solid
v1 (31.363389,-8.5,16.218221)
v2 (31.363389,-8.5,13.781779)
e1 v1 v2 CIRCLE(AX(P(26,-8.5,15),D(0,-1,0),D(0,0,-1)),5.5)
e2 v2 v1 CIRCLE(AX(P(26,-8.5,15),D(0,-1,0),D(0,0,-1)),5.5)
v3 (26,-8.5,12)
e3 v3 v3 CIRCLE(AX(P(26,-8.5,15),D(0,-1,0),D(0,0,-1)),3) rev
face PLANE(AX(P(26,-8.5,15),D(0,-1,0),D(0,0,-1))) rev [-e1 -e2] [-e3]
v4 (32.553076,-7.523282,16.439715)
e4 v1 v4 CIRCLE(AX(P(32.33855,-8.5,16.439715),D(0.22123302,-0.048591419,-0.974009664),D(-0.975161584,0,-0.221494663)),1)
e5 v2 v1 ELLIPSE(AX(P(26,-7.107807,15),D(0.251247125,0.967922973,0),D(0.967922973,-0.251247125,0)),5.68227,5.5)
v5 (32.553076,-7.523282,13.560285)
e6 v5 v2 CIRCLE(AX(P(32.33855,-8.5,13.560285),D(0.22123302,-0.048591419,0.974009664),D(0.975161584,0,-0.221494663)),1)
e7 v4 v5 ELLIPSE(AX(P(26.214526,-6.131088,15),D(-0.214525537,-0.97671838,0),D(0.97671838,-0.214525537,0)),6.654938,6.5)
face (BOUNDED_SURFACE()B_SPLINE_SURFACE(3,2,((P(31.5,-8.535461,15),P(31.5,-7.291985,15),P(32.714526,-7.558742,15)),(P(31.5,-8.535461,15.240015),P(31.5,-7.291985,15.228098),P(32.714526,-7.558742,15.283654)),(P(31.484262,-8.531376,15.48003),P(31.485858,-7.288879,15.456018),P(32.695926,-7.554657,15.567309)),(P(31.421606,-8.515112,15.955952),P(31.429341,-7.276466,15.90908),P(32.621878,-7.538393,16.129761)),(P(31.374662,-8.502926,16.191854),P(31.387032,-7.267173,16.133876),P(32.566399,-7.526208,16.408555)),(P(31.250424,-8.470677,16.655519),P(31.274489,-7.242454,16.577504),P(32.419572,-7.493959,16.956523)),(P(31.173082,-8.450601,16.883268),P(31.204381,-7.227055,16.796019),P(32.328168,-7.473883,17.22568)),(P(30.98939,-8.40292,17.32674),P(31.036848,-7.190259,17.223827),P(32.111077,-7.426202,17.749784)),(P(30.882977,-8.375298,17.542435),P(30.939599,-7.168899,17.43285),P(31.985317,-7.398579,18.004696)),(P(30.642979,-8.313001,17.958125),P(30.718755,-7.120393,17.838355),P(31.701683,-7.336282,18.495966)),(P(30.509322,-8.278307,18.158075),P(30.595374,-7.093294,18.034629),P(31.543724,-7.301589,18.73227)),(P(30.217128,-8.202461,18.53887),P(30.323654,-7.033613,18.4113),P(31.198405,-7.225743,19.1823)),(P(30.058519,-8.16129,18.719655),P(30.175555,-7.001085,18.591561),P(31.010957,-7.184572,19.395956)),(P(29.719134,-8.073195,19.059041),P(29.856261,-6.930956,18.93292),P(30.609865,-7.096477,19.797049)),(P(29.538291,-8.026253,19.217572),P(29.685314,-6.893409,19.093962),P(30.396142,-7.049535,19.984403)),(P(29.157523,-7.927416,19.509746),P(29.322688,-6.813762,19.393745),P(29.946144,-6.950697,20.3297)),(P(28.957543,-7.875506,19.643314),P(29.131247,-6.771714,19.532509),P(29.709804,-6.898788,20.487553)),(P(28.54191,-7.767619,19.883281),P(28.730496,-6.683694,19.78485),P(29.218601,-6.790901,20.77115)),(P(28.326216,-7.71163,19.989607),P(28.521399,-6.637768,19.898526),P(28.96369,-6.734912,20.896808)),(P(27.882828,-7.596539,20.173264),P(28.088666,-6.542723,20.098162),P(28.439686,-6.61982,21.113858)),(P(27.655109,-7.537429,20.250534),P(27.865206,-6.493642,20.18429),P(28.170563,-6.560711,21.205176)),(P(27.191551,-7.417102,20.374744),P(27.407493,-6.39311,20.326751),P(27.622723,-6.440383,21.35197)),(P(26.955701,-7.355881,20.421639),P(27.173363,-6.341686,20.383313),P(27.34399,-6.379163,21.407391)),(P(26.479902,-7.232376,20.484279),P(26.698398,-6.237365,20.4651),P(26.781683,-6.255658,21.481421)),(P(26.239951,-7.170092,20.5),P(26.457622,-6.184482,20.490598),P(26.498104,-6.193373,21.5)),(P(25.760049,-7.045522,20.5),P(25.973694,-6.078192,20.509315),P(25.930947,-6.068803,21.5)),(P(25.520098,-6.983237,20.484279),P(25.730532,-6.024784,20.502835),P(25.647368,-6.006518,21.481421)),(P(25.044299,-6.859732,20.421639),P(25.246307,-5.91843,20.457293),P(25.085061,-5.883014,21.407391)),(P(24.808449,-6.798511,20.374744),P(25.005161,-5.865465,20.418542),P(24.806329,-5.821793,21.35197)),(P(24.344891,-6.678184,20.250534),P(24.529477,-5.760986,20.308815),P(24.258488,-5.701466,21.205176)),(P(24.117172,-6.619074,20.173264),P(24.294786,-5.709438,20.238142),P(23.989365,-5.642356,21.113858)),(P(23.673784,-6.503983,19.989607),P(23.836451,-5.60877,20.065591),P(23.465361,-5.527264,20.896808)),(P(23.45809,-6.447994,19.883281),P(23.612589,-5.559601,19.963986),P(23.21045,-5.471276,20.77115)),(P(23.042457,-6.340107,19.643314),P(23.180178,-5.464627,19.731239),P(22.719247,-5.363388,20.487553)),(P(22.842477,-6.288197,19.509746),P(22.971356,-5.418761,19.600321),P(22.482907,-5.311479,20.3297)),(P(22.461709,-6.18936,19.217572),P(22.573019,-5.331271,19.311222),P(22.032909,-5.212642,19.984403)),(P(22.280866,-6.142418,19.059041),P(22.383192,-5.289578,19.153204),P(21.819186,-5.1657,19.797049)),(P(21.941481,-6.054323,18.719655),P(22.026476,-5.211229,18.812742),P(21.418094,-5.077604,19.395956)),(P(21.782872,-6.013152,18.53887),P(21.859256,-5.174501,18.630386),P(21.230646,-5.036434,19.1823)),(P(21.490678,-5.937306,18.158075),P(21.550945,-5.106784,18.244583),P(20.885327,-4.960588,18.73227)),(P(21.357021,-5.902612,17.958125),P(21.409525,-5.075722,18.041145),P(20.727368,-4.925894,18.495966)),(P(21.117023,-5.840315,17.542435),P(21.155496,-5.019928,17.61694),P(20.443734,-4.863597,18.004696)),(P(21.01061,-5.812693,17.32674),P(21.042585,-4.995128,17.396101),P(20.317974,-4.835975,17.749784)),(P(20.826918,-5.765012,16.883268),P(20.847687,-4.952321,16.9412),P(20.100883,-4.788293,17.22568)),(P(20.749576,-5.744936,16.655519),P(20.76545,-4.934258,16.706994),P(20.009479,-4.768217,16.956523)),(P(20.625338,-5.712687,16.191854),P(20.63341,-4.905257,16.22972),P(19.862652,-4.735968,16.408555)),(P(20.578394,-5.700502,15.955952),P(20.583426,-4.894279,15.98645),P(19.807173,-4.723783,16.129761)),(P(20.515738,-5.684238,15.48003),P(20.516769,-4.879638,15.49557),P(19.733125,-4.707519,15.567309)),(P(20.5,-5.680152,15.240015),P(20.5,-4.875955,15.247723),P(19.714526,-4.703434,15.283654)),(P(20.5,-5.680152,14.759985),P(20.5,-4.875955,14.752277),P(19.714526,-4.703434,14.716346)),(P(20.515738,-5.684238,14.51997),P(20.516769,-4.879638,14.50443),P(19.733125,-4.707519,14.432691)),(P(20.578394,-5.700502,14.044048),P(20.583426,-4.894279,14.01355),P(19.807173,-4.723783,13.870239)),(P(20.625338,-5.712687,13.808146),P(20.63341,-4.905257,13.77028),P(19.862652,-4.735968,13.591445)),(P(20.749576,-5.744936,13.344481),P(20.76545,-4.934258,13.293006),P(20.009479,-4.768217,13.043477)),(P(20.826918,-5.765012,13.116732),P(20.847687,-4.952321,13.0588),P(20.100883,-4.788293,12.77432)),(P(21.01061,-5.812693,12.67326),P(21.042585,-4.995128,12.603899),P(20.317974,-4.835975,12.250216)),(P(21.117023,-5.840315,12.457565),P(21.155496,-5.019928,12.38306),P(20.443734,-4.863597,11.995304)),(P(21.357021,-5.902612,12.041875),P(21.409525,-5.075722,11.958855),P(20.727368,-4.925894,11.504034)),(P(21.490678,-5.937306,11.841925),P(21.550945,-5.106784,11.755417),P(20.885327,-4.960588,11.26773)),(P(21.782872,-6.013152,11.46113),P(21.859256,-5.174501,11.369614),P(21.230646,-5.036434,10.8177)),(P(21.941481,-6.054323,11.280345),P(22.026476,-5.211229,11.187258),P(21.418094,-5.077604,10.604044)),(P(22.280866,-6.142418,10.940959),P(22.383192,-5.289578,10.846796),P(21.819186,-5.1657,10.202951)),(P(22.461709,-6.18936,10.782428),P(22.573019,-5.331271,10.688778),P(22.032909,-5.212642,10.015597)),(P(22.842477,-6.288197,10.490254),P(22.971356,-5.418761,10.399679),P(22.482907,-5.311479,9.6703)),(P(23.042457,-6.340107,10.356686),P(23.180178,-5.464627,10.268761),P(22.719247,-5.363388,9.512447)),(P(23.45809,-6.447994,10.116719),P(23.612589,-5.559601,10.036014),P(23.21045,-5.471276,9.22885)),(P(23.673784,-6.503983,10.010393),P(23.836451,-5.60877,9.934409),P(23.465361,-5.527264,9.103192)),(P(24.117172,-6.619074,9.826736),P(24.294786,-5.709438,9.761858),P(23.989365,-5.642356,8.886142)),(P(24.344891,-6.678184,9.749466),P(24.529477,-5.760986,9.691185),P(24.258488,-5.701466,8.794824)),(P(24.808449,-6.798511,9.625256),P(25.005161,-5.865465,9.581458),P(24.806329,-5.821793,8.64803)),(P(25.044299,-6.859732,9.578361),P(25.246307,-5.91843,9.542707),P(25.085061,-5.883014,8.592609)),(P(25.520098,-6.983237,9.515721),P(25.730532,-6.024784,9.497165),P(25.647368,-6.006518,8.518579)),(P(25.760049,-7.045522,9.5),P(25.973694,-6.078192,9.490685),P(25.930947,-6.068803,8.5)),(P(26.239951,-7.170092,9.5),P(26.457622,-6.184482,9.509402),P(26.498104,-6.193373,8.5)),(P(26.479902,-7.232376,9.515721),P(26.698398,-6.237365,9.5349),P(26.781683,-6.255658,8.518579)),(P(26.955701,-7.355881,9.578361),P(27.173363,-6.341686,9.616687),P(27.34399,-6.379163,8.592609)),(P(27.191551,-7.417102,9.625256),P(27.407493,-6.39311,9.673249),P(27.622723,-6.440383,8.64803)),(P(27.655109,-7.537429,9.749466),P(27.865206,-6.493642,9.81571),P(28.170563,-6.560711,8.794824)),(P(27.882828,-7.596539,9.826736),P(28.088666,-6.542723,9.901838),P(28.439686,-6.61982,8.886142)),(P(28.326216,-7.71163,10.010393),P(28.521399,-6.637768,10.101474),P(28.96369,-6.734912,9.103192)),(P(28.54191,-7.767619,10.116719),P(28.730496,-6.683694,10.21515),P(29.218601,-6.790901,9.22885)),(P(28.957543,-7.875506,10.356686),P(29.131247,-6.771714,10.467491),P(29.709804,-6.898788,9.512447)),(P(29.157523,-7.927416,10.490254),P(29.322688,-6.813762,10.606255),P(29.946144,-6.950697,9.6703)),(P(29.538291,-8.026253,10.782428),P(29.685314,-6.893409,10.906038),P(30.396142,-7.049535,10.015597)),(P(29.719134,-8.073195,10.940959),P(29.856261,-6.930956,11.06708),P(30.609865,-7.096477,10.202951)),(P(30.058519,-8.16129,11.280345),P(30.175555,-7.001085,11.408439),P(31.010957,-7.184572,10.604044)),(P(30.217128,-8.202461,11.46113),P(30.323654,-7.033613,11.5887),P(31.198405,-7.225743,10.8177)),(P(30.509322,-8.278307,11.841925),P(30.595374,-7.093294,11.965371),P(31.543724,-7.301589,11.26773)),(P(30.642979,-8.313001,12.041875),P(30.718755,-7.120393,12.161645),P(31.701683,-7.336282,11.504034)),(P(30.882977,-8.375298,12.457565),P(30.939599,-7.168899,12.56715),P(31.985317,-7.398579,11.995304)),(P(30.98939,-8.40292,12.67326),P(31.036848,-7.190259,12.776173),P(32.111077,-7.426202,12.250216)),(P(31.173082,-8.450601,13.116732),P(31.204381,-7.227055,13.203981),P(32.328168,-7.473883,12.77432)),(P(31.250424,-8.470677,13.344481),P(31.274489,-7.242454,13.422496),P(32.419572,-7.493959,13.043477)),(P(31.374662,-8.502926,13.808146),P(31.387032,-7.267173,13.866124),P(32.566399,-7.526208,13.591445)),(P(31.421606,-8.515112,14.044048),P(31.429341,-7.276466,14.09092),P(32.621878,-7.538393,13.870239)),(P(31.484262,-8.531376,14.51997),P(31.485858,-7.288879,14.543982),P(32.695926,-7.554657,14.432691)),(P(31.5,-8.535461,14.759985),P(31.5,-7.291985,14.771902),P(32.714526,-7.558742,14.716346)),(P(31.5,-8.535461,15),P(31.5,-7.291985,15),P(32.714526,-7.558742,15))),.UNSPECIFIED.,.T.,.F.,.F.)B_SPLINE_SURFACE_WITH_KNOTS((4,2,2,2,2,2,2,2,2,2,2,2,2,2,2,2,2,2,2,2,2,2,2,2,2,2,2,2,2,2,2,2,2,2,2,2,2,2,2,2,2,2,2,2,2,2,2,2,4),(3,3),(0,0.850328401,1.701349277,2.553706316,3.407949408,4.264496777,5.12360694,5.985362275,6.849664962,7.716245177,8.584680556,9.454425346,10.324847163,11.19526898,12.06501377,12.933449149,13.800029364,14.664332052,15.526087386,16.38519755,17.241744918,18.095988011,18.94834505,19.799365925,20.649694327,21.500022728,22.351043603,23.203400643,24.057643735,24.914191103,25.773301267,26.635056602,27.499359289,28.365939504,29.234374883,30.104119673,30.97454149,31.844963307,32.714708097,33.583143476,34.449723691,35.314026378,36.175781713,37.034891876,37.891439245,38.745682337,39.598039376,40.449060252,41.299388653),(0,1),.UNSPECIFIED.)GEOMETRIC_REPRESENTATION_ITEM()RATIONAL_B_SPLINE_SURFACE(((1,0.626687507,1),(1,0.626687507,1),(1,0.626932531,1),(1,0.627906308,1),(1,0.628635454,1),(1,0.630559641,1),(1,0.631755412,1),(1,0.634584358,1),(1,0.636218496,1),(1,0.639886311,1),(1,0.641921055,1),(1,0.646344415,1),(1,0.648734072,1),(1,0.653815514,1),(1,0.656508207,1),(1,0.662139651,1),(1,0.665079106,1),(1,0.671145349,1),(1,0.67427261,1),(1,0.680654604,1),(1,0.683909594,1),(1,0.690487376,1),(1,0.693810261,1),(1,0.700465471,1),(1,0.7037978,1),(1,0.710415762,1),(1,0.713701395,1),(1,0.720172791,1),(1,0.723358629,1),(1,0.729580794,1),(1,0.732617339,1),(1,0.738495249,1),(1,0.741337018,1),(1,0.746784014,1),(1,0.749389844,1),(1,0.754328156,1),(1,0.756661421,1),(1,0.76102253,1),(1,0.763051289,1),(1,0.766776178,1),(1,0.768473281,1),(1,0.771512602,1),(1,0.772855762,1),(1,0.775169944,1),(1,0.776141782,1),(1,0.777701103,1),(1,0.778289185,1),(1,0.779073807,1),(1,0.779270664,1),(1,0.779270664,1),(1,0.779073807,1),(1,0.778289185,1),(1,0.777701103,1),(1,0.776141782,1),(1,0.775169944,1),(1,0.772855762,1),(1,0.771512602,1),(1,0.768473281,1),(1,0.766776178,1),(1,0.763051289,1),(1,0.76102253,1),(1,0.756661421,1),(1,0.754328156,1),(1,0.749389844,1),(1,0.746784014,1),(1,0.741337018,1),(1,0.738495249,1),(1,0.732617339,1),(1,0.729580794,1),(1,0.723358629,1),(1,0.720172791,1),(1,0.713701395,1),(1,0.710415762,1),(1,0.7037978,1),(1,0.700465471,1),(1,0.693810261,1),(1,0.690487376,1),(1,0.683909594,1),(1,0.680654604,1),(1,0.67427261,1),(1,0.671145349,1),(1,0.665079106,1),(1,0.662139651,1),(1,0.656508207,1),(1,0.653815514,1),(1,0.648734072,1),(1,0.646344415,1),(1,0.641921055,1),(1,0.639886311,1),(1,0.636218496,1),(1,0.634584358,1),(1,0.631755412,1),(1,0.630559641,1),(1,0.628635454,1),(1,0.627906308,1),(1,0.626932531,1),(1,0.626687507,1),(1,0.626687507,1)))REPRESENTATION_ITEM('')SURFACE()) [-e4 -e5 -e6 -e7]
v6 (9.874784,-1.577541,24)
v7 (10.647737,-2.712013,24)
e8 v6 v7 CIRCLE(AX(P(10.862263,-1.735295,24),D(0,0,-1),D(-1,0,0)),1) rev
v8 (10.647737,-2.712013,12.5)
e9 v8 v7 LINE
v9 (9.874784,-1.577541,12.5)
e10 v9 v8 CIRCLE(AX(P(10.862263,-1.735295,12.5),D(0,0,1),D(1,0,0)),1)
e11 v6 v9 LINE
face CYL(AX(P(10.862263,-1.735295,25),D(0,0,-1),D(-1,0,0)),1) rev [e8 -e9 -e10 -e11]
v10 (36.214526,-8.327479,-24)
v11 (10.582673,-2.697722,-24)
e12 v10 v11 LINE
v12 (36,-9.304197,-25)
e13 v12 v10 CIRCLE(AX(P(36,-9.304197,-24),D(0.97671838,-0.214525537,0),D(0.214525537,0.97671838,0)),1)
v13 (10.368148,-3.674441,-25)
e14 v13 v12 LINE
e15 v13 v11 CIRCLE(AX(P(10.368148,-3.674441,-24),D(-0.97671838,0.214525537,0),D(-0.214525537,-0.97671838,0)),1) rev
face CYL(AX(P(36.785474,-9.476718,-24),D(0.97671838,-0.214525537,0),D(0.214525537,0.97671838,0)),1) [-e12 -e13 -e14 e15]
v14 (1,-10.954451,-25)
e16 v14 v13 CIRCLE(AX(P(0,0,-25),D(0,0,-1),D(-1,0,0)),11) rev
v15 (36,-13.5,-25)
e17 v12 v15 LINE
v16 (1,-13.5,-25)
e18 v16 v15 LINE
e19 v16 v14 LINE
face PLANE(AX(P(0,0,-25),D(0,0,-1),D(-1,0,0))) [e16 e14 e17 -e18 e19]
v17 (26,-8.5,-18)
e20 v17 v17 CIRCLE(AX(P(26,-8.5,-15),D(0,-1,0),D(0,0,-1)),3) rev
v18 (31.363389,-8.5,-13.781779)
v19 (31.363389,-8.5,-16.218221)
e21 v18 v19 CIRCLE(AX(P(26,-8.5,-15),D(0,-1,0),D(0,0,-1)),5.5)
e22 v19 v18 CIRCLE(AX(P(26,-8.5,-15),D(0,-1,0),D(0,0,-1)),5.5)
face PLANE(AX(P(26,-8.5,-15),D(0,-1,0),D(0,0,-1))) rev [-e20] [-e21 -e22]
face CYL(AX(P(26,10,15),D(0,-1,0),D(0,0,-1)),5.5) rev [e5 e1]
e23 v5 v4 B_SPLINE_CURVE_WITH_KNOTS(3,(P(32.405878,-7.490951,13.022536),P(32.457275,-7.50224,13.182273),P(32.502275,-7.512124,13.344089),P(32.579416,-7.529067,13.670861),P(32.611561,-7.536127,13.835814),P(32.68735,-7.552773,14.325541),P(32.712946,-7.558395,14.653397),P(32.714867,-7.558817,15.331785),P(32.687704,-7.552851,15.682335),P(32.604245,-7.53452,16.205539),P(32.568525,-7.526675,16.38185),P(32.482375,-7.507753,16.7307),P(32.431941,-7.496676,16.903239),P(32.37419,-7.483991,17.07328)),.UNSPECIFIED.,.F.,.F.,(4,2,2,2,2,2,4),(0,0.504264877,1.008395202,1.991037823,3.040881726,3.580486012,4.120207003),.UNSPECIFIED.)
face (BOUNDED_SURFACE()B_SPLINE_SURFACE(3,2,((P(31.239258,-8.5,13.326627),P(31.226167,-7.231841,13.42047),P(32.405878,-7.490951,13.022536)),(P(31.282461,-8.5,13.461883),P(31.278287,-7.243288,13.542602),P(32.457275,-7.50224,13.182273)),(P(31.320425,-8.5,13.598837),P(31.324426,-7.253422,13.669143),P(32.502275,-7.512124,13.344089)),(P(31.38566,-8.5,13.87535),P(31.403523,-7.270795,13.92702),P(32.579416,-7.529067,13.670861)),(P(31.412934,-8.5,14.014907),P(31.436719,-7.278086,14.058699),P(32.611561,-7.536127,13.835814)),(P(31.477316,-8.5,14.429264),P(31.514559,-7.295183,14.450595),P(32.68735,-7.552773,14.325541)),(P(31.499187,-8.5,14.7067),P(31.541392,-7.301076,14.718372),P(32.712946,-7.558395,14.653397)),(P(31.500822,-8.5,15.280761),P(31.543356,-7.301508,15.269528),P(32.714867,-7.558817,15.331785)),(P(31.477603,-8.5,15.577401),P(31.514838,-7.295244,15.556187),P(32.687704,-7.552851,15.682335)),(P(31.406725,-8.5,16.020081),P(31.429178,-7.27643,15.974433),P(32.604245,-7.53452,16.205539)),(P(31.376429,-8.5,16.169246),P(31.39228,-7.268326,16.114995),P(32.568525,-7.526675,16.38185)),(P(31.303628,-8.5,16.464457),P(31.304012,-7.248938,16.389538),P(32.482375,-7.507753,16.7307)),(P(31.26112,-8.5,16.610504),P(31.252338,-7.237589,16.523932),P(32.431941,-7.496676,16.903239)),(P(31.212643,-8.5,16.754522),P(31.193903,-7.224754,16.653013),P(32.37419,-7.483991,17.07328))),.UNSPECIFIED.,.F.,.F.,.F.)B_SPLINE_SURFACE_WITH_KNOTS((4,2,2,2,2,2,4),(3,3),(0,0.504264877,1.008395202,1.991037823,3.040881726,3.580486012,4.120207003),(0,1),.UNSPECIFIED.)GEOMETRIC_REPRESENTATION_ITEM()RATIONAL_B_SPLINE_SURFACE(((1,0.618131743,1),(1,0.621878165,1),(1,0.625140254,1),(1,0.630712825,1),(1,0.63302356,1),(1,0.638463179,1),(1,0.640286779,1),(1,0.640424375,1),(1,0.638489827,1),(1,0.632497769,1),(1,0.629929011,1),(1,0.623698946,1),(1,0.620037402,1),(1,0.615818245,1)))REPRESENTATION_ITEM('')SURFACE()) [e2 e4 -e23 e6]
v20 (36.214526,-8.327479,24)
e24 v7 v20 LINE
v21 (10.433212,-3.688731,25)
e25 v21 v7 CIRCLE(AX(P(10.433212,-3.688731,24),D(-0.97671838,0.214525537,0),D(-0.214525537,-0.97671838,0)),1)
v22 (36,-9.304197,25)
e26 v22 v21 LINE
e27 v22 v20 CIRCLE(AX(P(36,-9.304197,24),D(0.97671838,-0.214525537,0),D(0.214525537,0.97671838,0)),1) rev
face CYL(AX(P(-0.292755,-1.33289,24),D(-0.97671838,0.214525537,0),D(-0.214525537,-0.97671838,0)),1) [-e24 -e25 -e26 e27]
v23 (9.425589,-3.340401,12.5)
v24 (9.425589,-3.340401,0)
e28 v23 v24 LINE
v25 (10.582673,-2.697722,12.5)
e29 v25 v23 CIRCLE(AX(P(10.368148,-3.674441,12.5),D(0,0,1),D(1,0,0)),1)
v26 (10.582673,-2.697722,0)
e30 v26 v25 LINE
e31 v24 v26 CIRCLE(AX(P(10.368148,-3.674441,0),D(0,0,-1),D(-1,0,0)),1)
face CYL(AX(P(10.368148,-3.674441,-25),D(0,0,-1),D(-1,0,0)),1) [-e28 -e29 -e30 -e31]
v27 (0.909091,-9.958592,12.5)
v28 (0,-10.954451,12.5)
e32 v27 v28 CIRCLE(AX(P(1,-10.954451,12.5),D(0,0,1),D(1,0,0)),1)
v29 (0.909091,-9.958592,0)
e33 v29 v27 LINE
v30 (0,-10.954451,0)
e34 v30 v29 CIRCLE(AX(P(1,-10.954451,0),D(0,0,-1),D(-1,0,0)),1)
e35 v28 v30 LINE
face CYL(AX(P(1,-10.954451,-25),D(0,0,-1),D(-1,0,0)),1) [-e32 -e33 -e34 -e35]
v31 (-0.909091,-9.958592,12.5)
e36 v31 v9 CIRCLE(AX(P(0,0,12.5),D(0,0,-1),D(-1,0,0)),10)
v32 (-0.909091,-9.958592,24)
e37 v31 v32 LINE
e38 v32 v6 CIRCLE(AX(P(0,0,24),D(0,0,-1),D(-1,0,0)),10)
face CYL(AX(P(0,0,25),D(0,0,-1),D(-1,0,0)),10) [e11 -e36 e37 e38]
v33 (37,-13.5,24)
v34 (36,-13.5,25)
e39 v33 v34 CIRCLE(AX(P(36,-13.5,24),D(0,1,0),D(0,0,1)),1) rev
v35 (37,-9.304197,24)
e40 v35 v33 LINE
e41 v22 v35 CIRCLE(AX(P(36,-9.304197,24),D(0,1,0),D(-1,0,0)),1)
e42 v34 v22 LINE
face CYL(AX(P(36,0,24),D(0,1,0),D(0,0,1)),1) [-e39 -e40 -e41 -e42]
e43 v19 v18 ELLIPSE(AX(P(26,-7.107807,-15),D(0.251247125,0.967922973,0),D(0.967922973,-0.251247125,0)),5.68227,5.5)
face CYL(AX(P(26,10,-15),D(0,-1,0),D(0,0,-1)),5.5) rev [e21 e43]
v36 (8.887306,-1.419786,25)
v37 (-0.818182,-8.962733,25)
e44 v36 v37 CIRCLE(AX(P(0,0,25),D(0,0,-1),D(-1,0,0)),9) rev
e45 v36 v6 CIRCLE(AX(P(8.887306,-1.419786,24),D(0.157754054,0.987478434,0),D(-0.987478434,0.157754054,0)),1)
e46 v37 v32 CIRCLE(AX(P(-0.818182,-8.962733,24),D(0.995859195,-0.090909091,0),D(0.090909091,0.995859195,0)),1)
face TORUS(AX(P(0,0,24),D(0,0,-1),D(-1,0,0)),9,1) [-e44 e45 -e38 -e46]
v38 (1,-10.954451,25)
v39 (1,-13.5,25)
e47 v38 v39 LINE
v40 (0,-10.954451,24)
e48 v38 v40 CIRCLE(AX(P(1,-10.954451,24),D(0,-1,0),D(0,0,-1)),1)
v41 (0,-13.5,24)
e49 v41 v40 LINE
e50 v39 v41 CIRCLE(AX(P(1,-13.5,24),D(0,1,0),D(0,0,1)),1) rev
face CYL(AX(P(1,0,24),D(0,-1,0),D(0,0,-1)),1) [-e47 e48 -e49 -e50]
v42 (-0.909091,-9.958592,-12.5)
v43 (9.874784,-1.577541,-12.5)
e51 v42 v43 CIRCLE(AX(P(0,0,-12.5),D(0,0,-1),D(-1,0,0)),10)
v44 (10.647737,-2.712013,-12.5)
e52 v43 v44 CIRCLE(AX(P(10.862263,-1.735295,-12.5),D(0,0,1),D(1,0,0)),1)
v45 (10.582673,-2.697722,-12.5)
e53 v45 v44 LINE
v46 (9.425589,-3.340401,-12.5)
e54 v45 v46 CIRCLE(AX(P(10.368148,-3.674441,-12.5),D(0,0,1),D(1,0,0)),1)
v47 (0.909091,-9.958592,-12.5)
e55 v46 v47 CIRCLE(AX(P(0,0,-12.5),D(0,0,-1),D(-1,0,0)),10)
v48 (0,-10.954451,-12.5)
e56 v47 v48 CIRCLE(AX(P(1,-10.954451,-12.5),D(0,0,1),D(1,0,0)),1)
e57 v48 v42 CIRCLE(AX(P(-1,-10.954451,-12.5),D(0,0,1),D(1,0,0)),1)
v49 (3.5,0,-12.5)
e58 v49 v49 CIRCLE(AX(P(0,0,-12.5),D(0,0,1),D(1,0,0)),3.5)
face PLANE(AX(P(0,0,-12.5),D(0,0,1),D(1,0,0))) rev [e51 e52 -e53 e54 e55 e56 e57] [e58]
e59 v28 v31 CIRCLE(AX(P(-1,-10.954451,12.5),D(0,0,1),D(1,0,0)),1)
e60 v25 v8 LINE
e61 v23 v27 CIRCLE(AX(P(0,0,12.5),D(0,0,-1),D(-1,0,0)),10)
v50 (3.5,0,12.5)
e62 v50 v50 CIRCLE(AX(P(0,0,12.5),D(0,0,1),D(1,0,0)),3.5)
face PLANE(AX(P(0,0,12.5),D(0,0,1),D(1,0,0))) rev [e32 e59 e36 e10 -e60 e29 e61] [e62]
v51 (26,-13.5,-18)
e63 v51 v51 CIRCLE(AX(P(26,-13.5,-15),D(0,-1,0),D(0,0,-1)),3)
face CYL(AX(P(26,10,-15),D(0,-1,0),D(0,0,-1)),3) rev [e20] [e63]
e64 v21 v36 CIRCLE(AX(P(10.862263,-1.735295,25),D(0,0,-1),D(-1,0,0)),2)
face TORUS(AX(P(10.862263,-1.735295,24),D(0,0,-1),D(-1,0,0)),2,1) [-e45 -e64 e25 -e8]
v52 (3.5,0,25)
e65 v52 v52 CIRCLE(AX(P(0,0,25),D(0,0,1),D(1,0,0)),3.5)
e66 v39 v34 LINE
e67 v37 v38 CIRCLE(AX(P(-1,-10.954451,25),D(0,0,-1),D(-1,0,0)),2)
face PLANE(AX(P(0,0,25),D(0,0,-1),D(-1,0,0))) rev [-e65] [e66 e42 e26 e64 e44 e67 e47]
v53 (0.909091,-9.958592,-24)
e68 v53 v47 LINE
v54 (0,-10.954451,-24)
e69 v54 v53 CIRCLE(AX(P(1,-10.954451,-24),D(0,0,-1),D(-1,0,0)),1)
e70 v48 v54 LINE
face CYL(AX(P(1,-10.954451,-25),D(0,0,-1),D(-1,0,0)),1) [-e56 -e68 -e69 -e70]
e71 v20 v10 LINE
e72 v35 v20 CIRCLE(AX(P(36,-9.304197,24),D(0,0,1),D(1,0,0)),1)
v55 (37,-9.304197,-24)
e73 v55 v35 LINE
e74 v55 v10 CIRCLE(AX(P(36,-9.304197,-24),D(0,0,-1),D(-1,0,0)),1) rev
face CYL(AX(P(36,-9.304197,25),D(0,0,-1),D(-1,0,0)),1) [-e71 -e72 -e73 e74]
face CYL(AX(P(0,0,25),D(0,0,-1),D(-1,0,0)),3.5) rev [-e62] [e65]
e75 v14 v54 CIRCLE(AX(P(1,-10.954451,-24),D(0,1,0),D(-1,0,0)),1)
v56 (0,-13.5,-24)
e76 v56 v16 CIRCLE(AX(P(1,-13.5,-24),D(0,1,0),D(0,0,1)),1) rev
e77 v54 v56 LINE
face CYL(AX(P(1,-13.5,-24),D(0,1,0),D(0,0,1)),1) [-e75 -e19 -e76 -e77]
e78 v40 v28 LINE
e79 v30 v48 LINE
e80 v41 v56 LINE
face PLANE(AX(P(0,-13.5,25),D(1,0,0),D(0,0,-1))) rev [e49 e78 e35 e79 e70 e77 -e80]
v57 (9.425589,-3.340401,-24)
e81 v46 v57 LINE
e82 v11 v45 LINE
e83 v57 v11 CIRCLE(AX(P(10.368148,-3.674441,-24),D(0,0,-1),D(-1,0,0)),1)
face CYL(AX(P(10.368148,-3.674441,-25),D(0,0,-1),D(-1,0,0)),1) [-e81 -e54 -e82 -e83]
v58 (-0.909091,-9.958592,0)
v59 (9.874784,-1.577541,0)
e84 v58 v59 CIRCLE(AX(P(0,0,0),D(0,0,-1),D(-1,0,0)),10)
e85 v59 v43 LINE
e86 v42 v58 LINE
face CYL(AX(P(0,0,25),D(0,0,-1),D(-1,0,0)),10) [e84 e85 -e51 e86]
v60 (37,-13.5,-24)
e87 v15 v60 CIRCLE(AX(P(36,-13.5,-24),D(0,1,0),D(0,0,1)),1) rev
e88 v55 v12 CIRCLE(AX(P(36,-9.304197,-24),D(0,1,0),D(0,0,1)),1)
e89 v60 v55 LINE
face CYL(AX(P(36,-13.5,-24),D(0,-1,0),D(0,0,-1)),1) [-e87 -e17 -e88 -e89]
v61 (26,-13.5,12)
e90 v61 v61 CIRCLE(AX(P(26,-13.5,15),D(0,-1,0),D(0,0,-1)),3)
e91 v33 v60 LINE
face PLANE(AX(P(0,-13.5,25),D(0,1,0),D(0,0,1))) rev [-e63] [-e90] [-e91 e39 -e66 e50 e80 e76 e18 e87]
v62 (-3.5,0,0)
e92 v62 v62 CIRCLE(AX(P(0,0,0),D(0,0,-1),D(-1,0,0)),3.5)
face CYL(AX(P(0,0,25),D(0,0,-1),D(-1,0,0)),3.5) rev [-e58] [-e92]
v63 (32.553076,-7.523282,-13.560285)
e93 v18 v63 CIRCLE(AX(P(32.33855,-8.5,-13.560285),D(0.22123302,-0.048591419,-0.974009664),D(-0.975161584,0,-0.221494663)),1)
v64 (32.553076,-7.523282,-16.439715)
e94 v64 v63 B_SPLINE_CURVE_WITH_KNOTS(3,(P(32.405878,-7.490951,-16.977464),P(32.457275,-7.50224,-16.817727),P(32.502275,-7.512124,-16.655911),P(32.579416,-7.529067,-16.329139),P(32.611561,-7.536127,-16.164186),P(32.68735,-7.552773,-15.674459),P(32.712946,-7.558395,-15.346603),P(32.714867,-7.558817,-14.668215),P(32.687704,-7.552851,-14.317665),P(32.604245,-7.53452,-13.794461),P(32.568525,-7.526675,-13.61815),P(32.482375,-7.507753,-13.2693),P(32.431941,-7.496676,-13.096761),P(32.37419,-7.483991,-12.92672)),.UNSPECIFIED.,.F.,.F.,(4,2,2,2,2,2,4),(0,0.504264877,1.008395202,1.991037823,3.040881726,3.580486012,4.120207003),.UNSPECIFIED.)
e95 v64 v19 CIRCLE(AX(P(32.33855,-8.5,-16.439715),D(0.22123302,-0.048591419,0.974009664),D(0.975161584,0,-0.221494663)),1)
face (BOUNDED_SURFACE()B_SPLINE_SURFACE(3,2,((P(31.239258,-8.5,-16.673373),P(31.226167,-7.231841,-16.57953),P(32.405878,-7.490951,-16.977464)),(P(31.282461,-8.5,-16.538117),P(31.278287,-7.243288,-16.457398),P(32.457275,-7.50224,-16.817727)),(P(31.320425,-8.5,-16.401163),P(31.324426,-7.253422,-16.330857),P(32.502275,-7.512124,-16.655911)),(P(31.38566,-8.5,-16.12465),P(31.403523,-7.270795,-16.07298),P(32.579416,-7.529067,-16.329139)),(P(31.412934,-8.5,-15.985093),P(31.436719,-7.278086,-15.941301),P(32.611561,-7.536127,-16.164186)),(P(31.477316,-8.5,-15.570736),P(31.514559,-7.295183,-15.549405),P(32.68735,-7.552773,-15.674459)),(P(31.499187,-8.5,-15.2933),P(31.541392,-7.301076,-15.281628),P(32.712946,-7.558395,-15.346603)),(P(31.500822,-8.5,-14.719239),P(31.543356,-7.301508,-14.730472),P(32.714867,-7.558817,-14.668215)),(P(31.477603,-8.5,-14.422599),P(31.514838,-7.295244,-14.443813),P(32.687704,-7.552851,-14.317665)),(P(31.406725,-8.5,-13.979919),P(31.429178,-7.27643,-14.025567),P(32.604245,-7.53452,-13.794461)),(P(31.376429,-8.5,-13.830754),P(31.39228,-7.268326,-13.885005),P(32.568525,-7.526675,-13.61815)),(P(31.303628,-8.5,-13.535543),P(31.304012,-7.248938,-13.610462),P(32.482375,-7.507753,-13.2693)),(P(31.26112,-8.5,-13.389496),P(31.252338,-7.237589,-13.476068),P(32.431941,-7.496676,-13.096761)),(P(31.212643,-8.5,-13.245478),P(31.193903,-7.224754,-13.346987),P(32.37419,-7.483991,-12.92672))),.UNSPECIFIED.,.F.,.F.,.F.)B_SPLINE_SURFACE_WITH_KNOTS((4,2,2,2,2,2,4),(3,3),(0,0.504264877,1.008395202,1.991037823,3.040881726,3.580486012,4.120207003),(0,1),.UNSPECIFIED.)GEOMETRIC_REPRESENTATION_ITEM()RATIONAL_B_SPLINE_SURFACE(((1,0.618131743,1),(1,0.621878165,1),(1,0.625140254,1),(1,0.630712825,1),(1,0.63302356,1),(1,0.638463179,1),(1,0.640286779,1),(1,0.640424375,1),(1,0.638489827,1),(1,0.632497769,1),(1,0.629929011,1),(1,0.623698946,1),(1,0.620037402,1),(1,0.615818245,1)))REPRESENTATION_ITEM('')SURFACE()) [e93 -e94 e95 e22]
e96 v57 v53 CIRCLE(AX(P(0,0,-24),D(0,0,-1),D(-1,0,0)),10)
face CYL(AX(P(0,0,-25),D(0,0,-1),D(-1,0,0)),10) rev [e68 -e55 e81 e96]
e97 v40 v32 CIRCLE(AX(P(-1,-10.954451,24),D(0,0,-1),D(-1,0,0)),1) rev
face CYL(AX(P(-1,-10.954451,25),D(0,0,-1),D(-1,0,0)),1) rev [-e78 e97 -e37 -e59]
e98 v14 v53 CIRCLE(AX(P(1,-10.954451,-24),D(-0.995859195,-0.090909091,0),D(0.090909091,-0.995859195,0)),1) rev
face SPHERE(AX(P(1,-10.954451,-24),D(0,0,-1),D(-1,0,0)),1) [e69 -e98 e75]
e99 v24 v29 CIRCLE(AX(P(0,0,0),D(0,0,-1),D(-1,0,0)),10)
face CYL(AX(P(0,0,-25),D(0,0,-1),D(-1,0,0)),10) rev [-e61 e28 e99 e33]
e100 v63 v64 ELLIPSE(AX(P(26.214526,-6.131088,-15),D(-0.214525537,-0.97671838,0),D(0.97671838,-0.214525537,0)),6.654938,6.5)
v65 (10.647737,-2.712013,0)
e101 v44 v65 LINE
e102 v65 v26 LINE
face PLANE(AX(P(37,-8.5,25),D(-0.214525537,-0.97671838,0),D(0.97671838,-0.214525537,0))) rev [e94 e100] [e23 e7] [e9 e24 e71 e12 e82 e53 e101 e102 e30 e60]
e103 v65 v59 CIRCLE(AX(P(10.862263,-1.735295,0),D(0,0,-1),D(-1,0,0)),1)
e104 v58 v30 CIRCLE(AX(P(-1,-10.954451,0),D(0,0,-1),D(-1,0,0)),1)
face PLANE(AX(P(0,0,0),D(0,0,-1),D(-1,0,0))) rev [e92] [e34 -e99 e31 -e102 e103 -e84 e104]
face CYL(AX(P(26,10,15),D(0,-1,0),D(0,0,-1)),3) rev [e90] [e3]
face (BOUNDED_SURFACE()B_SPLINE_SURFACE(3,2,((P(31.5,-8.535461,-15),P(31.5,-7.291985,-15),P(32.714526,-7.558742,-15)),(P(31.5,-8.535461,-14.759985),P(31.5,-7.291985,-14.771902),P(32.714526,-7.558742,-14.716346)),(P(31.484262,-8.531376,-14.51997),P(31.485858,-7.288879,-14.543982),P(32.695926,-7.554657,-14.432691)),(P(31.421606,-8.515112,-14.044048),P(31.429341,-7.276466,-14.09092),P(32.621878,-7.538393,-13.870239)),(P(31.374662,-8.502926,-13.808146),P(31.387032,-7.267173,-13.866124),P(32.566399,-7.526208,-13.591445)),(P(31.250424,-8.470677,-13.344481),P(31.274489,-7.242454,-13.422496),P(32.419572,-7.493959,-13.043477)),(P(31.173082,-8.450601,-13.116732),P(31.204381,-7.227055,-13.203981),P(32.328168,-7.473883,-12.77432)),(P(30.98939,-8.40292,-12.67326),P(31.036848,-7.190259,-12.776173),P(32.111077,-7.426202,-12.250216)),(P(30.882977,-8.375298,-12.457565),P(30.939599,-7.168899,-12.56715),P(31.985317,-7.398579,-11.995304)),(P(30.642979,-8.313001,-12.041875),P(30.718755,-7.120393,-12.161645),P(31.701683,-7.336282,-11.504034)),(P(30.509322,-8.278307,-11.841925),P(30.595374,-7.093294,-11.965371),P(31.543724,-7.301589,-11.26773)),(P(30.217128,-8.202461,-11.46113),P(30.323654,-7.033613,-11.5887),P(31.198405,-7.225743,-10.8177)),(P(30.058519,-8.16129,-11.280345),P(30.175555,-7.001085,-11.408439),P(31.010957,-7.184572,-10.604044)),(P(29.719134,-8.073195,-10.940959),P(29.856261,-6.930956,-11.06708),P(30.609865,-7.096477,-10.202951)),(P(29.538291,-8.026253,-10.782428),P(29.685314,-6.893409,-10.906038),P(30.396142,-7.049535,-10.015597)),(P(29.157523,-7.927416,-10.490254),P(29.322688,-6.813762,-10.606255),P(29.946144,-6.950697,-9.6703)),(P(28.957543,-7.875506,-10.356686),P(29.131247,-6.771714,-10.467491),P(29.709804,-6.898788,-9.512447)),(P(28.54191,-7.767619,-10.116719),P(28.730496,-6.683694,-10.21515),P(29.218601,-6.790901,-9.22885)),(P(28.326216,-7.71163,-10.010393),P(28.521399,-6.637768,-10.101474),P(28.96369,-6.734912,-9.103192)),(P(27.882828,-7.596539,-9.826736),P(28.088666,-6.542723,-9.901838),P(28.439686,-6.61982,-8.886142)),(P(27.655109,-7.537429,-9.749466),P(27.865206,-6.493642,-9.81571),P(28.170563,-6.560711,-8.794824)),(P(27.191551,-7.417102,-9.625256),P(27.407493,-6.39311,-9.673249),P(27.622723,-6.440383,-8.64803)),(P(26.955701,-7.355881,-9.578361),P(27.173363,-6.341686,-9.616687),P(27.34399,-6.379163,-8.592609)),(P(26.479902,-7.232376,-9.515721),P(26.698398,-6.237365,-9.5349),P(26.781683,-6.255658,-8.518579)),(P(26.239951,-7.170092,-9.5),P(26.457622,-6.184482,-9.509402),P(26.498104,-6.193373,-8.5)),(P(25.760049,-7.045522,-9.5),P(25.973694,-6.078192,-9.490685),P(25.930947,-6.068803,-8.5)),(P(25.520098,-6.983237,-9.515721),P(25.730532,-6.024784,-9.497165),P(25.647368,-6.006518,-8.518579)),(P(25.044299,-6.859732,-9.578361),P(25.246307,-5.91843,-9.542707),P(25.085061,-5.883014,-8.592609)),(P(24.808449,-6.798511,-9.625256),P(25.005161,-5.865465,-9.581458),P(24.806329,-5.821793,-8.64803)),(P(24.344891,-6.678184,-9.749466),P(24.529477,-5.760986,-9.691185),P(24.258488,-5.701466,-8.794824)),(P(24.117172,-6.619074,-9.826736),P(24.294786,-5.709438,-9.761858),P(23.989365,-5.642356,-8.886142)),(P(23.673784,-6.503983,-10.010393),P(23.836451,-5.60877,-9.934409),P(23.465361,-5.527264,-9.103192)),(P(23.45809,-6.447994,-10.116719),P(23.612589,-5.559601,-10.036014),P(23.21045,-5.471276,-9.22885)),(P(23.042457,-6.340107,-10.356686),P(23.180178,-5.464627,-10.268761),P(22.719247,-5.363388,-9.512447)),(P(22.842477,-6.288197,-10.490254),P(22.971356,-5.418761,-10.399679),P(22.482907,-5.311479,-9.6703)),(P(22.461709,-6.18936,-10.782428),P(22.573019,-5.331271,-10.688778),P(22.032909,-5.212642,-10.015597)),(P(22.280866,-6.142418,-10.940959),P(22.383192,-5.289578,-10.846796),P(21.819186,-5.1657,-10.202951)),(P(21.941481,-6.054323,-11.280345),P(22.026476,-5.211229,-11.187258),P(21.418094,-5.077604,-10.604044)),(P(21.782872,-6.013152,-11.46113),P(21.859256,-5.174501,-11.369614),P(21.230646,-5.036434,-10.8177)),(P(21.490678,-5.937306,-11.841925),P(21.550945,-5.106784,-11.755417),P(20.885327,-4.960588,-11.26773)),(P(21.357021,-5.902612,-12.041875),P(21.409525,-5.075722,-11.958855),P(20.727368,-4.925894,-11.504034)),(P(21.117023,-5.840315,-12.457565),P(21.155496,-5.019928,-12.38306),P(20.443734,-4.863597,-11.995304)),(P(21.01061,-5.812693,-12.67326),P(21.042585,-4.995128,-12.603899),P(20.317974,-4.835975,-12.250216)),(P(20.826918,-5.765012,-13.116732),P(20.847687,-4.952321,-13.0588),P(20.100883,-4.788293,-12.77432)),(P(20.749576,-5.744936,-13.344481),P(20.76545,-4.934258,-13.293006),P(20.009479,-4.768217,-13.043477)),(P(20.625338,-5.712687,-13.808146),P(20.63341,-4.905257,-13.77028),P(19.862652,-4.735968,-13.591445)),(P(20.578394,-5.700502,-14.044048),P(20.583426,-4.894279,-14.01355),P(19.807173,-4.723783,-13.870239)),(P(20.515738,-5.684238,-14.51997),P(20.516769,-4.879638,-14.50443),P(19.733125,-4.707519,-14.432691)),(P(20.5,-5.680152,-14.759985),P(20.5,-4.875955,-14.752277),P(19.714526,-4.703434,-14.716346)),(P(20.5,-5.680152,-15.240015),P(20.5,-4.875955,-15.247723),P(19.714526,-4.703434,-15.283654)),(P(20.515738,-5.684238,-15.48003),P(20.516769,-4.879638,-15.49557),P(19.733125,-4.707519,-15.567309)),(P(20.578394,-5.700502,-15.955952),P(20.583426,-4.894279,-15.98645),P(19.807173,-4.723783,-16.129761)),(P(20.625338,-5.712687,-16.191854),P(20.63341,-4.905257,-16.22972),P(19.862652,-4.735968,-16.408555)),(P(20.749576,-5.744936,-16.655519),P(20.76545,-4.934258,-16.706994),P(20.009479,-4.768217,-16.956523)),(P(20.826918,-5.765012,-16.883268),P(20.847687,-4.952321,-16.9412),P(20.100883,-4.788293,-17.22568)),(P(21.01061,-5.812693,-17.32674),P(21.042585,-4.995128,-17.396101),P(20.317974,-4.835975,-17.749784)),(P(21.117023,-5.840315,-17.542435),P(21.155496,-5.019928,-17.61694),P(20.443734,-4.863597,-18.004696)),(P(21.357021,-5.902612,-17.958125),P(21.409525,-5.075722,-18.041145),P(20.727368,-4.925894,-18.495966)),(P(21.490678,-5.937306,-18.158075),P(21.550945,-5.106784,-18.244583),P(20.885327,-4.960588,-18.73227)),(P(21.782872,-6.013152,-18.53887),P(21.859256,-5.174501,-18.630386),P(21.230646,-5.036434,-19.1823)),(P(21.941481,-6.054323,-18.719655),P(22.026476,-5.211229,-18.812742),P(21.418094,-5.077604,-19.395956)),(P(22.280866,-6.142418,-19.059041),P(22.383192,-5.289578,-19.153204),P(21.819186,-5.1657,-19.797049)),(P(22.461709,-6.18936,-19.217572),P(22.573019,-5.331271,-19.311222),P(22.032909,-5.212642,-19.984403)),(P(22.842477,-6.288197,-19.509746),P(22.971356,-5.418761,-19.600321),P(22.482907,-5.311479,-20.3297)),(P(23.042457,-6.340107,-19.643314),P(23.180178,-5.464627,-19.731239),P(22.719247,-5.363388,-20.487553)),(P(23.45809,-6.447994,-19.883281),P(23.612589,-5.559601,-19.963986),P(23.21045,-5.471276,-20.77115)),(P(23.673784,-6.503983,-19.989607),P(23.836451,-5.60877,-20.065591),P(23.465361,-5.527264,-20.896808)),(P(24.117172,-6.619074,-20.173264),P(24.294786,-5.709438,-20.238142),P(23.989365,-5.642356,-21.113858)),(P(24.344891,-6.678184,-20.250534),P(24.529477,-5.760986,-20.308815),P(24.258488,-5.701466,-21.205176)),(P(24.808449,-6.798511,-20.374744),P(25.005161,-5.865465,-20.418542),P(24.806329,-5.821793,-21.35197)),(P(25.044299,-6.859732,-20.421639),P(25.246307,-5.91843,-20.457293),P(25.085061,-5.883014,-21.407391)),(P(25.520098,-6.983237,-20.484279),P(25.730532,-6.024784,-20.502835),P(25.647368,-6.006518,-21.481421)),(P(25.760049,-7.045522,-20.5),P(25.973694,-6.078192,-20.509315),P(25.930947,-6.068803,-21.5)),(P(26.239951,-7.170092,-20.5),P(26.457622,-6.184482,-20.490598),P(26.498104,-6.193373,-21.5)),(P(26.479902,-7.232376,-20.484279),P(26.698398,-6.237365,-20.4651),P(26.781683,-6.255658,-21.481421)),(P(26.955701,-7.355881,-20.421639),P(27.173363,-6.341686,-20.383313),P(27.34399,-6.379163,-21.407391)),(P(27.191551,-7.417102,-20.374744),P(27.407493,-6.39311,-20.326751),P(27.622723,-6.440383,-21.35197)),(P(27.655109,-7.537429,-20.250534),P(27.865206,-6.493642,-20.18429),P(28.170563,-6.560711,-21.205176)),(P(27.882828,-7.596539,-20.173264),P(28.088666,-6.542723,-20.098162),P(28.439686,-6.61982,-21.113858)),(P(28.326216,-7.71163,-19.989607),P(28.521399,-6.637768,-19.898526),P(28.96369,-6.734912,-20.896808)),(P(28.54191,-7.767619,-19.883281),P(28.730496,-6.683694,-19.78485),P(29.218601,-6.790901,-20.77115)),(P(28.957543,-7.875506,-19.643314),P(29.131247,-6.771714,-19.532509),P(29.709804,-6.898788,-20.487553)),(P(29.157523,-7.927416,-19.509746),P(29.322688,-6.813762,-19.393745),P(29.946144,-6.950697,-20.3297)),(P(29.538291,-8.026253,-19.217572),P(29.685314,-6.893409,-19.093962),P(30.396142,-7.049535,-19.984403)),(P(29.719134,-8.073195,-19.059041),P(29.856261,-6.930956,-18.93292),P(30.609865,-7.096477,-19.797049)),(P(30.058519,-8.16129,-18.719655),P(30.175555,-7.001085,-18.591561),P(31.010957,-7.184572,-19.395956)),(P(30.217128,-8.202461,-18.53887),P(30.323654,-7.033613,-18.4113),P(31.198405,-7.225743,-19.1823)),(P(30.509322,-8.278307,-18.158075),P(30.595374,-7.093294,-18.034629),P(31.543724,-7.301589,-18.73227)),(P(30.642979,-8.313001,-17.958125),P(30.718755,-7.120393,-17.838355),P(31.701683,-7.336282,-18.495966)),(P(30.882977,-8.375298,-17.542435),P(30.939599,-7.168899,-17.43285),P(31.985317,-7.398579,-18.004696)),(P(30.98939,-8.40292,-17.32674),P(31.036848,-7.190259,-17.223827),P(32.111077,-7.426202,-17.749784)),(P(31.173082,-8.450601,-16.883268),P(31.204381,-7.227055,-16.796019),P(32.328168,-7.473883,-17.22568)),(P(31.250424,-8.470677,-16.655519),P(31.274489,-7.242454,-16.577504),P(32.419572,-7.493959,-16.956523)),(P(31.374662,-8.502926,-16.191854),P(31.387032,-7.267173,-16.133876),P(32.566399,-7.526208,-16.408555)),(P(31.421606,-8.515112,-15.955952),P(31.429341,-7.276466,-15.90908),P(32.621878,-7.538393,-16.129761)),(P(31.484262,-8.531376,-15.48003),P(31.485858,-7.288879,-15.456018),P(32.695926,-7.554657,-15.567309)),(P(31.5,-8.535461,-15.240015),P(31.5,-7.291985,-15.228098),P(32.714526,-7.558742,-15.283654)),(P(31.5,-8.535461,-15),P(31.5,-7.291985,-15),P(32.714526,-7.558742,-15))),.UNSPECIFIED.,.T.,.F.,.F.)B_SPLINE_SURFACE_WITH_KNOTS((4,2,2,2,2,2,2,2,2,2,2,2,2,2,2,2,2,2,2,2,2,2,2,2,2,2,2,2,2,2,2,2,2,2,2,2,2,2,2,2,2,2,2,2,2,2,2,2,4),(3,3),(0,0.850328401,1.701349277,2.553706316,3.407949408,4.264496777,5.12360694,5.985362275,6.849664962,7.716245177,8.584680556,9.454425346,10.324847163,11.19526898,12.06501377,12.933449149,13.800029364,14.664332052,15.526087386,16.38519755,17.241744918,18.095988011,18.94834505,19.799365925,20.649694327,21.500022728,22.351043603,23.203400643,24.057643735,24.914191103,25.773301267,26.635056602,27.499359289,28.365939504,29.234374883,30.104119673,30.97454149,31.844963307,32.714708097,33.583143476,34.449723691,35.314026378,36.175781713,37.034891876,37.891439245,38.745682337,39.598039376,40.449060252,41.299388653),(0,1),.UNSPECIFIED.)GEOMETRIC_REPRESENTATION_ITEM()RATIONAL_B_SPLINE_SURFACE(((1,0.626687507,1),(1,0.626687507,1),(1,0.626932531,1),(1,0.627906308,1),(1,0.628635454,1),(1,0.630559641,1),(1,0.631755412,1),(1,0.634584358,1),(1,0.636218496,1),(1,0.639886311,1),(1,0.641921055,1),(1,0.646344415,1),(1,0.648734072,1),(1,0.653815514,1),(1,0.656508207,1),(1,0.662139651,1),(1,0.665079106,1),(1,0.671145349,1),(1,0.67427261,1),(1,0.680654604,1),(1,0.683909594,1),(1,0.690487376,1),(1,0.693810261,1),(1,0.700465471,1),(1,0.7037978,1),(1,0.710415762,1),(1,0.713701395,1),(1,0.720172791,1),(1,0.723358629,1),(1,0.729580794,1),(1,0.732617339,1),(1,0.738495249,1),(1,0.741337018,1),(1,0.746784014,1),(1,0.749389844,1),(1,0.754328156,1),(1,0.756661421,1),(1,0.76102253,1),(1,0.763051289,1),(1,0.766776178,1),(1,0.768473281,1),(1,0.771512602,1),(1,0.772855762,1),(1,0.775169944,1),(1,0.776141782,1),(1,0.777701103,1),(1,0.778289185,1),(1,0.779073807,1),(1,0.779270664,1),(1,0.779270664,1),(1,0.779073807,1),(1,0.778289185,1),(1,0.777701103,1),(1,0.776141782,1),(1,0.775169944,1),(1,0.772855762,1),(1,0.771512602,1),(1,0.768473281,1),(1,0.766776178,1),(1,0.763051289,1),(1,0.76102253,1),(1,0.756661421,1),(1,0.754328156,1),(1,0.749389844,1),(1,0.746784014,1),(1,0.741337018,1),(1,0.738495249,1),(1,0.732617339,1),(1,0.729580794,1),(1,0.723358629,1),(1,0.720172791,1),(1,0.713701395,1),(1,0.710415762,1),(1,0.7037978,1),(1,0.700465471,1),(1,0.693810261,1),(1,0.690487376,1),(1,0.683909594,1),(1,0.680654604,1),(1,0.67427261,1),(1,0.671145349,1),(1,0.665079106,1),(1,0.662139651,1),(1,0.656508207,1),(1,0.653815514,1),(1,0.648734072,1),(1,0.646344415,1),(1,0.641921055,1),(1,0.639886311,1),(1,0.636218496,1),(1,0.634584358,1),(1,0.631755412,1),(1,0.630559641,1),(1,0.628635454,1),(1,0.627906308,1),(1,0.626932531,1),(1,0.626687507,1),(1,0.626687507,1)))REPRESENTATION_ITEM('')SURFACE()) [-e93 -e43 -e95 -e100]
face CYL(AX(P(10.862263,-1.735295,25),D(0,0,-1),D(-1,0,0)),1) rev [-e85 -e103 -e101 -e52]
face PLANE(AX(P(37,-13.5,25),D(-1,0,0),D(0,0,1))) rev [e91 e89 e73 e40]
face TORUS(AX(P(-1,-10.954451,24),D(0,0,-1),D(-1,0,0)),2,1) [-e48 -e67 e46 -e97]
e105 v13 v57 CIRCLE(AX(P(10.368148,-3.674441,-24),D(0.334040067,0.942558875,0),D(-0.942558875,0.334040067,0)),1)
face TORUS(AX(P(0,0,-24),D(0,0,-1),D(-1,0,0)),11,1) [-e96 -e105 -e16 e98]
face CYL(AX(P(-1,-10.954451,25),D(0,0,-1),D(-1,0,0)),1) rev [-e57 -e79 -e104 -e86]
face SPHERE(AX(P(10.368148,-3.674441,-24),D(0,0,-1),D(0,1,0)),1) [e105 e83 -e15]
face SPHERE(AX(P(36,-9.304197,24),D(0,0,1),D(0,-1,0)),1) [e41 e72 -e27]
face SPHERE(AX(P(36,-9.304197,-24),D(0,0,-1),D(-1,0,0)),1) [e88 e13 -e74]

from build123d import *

# Parameters (mm, degrees)
SKETCH1_R           = 3.5
BOSS_EXTRUDE1_DEPTH = 25
SKETCH2_R           = 3
CUT_EXTRUDE1_DEPTH  = 51.460380498
SKETCH3_R           = 5.5
CUT_EXTRUDE2_DEPTH  = 49.334770094
SKETCH5_W           = 10
SKETCH5_H           = 12.5
FILLET3_R           = 1
FILLET4_R           = 1


with BuildPart() as part:
    # Sketch1 → Boss-Extrude1 (new, symmetric)
    with BuildSketch(Plane.XY):
        with BuildLine():
            Line((0, -13.5), (37, -13.5))
            Line((37, -13.5), (37, -8.5))
            Line((37, -8.5), (9.682458366, -2.5))
            ThreePointArc((9.682458366, -2.5), (-6.123724357, 7.90569415), (0, -10))
            Line((0, -10), (0, -13.5))
        make_face()
        Circle(SKETCH1_R, mode=Mode.SUBTRACT)
    extrude(amount=BOSS_EXTRUDE1_DEPTH, both=True)

    # Sketch2 → Cut-Extrude1 (cut, through all)
    with BuildSketch(Plane.XZ.offset(13.5)):
        with Locations((26, 15)):
            Circle(SKETCH2_R)
        with Locations((26, -15)):
            Circle(SKETCH2_R)
    extrude(amount=-CUT_EXTRUDE1_DEPTH, mode=Mode.SUBTRACT)

    # Sketch3 → Cut-Extrude2 (cut, through all)
    with BuildSketch(Plane(origin=(0, -8.5, 0), x_dir=(-1, 0, 0), z_dir=(0, -1, 0))):
        with Locations((-26, 15)):
            Circle(SKETCH3_R)
        with Locations((-26, -15)):
            Circle(SKETCH3_R)
    extrude(amount=-CUT_EXTRUDE2_DEPTH, mode=Mode.SUBTRACT)

    # Sketch5 → Cut-Revolve1 (revolve, cut)
    with BuildSketch(Plane(origin=(0, 0, 0), x_dir=(1, 0, 0), z_dir=(0, 1, 0))):
        with Locations((-5, 18.75)):
            Rectangle(SKETCH5_W, SKETCH5_H)
        with Locations((-5, -6.25)):
            Rectangle(SKETCH5_W, SKETCH5_H)
    revolve(axis=Axis((0, 0, -25), (0, 0, 1)), mode=Mode.SUBTRACT)

    # Fillet3
    fillet3_edges = [part.edges().sort_by_distance(p)[0] for p in [
        (0, -10, -6.25),
        (0, -10, 18.75),
        (9.682458366, -2.5, -6.25),
        (9.682458366, -2.5, 18.75),
    ]]
    fillet(fillet3_edges, radius=FILLET3_R)

    # Fillet4
    fillet4_edges = [part.edges().sort_by_distance(p)[0] for p in [
        (0, -12.227225575, 25),
        (-0.261451054, -10.280251288, 25),
        (-6.136482738, 7.895795058, 25),
        (10.03584865, -2.298357368, 25),
        (0, -10, -18.75),
        (0, -11.75, -25),
        (23.341229183, -5.5, -25),
        (6.123724357, -7.90569415, -25),
        (9.682458366, -2.5, -18.75),
        (37, -11, -25),
        (37, -11, 25),
        (37, -8.5, 0),
        (31.5, -7.291985002, -15.00000132),
        (31.5, -7.291985002, 14.99999868),
        (23.823868621, -5.606006487, 25),
        (0, -10, 6.25),
        (9.682458366, -2.5, 6.25),
    ]]
    fillet(fillet4_edges, radius=FILLET4_R)


solid = part.part
